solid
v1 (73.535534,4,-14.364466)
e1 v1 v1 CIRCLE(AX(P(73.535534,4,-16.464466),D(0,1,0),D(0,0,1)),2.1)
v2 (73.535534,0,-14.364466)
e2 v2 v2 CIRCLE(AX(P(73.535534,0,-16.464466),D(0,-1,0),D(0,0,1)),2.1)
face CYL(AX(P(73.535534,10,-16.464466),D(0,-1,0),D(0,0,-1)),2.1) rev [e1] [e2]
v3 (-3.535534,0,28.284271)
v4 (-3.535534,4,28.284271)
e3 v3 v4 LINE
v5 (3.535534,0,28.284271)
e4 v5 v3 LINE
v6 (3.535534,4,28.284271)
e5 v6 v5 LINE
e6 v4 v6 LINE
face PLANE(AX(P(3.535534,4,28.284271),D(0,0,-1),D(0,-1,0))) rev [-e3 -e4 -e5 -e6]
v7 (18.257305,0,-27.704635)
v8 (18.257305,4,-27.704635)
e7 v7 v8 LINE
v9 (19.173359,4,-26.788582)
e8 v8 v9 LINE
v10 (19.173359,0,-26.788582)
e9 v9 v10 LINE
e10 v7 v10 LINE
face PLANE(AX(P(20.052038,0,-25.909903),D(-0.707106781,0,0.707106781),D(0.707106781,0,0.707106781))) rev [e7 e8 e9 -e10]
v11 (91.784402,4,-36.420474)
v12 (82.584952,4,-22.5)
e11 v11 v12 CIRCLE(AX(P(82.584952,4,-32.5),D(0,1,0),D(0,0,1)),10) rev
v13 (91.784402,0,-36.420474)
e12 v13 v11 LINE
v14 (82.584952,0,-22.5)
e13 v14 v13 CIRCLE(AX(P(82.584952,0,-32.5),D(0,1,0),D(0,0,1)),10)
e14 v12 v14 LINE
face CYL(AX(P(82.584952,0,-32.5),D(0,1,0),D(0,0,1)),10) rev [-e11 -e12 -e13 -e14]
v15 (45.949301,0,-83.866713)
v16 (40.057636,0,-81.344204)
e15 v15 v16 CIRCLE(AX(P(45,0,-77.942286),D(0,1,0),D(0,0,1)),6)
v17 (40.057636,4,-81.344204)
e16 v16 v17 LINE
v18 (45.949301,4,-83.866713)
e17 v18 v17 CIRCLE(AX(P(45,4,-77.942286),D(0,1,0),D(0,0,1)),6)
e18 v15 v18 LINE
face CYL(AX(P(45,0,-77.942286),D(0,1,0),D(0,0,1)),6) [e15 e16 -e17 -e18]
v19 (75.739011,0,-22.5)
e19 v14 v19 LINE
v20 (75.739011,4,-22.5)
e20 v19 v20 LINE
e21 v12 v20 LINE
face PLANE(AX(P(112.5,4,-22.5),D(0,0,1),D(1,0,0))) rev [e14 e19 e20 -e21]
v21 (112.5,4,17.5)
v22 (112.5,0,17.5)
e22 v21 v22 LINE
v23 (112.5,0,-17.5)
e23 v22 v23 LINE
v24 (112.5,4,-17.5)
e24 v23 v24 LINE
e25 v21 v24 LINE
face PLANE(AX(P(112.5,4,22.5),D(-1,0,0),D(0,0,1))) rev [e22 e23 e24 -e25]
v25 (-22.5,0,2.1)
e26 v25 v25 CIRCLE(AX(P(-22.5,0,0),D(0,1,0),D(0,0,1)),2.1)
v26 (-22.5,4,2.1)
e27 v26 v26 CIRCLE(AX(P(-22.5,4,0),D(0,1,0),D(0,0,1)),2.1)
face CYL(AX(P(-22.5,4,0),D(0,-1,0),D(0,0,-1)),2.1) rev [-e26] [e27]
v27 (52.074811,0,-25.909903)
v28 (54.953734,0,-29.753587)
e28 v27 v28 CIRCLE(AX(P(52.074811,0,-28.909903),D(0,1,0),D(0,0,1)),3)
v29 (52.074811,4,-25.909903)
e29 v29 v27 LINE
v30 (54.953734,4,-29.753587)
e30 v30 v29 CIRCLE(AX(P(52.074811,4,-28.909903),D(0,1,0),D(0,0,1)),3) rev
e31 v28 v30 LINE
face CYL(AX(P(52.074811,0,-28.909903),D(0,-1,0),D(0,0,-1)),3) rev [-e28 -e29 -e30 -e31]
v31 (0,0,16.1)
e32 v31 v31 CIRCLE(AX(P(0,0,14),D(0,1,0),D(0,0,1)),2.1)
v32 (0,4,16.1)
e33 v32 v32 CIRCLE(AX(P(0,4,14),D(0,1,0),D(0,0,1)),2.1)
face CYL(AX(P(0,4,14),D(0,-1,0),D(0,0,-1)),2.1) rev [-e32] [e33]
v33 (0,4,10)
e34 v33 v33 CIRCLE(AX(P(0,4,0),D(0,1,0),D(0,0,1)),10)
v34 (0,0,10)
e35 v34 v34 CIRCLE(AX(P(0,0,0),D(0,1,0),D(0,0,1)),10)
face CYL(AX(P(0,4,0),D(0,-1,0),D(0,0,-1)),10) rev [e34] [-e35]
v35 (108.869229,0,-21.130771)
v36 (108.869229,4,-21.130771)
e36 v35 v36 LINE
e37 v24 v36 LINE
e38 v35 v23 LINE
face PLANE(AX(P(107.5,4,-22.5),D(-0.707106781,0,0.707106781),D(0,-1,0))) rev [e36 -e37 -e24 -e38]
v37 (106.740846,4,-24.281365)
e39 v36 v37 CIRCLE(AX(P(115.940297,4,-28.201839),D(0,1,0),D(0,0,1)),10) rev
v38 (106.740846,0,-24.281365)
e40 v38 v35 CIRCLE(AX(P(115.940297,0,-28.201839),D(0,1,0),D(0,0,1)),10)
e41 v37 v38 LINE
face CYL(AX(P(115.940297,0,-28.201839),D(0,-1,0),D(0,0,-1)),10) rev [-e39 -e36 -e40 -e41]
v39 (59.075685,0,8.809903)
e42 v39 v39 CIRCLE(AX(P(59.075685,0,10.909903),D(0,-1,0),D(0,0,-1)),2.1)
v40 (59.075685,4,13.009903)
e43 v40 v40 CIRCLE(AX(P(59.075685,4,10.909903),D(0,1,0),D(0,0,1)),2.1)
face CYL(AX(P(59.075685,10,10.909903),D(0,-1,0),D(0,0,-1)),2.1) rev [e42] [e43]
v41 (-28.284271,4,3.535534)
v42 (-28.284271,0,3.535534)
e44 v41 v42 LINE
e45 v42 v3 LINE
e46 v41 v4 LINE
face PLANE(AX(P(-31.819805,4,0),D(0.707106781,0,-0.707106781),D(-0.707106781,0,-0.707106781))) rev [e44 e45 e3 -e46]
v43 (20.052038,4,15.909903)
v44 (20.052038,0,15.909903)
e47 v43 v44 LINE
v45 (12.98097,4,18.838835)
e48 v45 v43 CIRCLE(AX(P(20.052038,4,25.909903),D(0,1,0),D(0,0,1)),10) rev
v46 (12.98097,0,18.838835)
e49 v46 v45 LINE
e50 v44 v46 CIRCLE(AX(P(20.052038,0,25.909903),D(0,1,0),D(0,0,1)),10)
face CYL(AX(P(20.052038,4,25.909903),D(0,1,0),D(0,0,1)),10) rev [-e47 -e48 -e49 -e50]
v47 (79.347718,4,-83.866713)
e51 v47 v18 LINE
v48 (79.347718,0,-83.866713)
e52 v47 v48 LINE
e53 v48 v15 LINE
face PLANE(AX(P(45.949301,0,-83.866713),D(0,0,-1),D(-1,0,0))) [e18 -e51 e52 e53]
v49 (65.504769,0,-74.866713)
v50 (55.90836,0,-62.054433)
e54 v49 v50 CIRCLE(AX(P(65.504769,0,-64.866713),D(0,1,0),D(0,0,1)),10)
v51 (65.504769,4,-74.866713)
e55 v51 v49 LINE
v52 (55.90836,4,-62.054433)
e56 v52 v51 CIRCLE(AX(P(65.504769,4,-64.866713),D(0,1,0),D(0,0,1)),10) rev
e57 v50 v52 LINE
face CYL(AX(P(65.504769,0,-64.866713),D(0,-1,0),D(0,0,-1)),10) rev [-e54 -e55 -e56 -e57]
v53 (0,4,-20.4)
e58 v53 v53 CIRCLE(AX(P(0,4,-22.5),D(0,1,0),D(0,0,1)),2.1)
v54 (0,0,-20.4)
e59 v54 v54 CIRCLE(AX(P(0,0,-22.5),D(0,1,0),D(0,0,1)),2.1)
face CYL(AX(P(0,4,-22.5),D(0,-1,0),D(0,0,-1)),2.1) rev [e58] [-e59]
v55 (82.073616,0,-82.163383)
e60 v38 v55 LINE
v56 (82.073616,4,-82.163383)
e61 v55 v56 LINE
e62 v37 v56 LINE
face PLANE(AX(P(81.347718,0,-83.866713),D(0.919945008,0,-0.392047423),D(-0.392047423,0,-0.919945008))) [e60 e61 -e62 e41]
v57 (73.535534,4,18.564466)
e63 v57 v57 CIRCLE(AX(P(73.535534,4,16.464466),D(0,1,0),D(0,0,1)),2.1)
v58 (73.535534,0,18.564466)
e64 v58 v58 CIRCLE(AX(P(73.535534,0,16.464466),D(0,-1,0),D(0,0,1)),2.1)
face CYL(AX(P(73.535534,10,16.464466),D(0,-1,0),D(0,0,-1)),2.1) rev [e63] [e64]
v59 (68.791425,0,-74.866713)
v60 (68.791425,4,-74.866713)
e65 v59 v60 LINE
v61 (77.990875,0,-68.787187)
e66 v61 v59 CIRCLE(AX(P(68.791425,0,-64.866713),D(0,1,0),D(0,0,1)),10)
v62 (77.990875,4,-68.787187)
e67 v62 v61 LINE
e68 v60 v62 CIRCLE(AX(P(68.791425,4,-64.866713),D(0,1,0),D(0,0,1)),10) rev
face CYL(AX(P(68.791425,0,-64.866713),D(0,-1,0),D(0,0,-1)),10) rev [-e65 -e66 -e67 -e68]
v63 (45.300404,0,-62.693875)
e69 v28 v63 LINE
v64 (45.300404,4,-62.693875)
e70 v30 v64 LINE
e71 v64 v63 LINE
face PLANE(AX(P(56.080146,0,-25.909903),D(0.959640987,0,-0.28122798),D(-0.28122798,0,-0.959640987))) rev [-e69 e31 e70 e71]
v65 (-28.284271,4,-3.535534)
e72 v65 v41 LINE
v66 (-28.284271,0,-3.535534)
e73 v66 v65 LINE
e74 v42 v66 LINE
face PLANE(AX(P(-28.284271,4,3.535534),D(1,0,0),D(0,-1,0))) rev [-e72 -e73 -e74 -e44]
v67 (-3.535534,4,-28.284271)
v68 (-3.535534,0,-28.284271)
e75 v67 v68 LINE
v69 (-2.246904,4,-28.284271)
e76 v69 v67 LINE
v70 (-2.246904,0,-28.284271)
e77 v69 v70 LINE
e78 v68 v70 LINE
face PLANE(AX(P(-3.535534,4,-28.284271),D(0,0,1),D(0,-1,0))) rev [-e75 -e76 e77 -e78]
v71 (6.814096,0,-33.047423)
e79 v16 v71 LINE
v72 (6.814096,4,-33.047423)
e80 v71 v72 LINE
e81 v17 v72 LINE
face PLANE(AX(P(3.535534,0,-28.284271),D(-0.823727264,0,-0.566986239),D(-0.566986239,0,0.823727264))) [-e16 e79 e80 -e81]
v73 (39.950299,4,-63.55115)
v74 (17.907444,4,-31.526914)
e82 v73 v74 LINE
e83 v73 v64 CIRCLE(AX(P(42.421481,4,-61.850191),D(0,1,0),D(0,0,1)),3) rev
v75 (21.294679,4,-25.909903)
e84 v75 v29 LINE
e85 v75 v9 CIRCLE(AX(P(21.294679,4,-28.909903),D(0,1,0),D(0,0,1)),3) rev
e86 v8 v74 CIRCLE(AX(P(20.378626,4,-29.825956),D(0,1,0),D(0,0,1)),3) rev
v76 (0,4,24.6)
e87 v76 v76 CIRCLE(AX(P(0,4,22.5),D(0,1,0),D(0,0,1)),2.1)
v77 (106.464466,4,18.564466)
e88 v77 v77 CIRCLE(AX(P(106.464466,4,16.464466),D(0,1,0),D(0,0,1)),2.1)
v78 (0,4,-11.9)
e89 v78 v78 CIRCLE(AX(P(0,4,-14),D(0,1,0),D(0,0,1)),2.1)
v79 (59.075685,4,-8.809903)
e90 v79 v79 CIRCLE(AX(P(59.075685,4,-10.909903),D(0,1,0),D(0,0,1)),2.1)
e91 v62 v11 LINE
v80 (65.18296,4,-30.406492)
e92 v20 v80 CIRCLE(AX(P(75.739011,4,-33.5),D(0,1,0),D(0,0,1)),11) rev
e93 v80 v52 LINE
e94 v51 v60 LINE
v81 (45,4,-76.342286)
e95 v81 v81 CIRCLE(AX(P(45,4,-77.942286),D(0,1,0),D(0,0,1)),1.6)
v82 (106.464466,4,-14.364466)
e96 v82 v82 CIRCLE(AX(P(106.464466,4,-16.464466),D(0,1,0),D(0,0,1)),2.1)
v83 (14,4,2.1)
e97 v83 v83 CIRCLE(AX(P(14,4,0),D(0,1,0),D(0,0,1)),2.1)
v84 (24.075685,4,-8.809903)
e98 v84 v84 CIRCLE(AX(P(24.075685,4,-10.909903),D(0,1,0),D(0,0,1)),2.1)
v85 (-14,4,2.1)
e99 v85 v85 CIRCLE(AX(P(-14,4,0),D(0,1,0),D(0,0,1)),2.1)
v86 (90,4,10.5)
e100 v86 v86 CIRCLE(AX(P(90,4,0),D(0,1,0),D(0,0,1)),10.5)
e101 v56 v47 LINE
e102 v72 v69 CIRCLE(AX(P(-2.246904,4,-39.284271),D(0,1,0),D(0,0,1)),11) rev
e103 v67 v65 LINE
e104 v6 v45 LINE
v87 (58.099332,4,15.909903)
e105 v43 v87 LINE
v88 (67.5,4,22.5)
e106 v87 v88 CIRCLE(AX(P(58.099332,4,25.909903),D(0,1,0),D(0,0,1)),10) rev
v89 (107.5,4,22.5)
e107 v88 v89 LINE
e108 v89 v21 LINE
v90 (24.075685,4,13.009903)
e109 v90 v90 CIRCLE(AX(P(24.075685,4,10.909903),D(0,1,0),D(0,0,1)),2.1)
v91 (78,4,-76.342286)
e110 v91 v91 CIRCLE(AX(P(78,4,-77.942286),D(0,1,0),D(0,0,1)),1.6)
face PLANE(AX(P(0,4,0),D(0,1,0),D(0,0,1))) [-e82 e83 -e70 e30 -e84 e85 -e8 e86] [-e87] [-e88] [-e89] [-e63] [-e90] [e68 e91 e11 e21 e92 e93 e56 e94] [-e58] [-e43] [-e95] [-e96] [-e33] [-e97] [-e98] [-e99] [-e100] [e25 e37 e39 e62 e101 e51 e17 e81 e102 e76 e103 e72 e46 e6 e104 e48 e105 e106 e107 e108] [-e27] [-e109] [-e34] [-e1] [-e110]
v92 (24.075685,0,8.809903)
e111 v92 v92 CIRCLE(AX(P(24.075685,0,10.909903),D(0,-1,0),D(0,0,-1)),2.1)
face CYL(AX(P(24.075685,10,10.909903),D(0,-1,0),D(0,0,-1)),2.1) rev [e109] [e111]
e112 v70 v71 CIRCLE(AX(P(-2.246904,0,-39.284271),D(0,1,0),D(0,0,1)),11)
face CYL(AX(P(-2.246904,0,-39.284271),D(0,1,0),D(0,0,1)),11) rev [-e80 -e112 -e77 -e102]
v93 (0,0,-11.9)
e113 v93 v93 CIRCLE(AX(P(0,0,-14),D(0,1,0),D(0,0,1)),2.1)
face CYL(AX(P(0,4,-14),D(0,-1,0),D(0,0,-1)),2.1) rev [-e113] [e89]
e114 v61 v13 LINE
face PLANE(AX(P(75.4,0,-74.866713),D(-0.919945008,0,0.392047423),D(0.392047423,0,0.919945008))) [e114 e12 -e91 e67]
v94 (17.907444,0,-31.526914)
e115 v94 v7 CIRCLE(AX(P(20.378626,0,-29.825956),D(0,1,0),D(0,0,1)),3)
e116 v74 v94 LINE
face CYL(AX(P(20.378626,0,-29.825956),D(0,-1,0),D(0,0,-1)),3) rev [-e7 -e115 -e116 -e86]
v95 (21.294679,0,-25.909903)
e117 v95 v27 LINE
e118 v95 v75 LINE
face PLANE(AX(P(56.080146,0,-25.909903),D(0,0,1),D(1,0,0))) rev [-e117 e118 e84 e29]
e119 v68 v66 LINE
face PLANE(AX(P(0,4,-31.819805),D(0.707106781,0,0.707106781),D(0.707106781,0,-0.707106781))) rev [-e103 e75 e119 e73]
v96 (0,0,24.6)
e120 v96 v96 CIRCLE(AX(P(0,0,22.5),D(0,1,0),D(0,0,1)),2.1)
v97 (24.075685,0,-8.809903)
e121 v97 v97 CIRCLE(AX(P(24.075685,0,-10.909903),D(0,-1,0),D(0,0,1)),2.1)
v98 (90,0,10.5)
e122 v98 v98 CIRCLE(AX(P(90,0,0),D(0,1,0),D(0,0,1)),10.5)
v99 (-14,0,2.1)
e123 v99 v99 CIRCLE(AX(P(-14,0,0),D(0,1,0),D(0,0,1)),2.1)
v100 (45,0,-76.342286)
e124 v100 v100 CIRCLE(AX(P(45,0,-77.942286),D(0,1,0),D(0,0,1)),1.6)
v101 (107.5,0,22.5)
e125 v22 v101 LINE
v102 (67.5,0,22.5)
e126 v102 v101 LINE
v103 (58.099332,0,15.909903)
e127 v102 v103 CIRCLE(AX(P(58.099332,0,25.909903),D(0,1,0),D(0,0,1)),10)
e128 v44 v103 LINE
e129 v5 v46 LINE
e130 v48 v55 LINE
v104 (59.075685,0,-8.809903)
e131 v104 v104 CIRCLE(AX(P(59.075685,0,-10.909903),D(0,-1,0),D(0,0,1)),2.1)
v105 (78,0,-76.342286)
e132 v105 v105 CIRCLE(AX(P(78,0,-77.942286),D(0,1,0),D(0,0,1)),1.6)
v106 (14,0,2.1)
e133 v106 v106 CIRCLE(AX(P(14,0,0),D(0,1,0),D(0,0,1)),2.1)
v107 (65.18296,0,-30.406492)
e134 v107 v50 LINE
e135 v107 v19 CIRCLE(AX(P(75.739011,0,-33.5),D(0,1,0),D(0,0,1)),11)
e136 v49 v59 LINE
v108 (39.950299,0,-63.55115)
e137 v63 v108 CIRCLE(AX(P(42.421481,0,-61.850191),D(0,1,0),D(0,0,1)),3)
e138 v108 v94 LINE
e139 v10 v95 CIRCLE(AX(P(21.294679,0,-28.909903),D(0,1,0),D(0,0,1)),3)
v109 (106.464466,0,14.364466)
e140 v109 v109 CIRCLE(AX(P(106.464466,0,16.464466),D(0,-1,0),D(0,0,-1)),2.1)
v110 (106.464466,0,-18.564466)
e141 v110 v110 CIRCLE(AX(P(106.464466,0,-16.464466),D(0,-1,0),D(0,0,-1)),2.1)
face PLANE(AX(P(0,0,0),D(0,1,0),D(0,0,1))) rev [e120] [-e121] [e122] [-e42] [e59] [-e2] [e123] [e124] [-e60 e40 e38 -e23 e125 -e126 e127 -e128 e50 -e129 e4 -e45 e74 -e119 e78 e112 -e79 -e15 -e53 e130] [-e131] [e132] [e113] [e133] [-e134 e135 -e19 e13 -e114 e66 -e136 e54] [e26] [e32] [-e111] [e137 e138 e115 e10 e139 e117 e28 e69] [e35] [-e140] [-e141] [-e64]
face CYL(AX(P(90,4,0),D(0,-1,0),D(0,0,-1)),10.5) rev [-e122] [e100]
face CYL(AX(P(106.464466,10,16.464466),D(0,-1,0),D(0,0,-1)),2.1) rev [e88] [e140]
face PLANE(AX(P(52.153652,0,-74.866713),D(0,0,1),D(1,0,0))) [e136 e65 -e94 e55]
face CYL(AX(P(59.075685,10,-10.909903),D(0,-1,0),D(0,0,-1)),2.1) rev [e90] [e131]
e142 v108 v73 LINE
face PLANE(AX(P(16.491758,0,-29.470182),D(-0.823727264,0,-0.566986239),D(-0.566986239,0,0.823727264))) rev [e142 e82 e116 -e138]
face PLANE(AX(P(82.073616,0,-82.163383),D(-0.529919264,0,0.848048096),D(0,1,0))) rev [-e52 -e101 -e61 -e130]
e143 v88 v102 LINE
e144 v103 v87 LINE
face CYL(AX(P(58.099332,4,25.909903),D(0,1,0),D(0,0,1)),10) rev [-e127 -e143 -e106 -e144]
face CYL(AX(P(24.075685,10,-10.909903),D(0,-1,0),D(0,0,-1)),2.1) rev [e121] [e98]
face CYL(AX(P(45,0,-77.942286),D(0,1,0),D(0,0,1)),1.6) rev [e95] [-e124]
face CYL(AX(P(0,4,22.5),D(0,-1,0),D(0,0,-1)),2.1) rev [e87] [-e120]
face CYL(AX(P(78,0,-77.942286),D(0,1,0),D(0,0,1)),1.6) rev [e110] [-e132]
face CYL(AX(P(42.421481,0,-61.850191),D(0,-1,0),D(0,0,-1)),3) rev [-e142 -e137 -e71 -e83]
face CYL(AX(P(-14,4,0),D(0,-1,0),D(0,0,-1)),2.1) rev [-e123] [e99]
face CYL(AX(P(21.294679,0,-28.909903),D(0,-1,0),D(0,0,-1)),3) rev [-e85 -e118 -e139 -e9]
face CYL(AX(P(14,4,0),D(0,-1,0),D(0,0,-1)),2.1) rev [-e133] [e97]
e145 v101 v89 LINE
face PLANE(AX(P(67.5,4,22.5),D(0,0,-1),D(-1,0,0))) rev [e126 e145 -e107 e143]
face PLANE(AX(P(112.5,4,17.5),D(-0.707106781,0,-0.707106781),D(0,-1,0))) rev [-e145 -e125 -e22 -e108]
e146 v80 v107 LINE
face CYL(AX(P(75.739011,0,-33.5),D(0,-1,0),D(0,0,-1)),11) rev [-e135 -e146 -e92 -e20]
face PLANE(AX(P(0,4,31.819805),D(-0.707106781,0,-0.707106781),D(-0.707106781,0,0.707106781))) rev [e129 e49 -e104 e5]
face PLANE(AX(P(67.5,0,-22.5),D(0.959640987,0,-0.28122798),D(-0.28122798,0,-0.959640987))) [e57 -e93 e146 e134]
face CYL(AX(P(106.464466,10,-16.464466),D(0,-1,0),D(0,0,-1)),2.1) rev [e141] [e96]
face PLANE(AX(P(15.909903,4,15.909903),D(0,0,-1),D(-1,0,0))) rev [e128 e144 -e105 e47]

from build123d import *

# Parameters (mm, degrees)
SKETCH_1_R          = 2.1
SKETCH_1_R_2        = 10.5
SKETCH_1_R_3        = 10
EXTRUDE_1_DEPTH     = 4
CHAMFER_1_SIZE      = 5
FILLET_1_R          = 10
SKETCH_2_R          = 2.1
CUT_EXTRUDE_1_DEPTH = 10
EXTRUDE_START       = -4
SKETCH_3_R          = 1.6
EXTRUDE_2_DEPTH     = 4
FILLET_2_R          = 3
FILLET_3_R          = 11
SKETCH_4_R          = 1.6
EXTRUDE_3_DEPTH     = 4
FILLET_4_R          = 10
CHAMFER_2_SIZE      = 2
CHAMFER_2_SIZE2     = 1.851556395
FILLET_5_R          = 10


with BuildPart() as part:
    # 草图1 → 凸台-拉伸1 (new body)
    with BuildSketch(Plane(origin=(0, 0, 0), x_dir=(1, 0, 0), z_dir=(0, 1, 0))):
        Polygon((0, 31.819805153), (-31.819805153, 0), (0, -31.819805153), (15.909902577, -15.909902577), (67.5, -15.909902577), (67.5, -22.5), (112.5, -22.5), (112.5, 22.5), (67.5, 22.5), (67.5, 15.909902577), (15.909902577, 15.909902577), align=None)
        with Locations(Location((0, 14, 0), (0, 0, 270))):
            Circle(SKETCH_1_R, mode=Mode.SUBTRACT)
        with Locations(Location((14, 0, 0), (0, 0, 270))):
            Circle(SKETCH_1_R, mode=Mode.SUBTRACT)
        with Locations(Location((0, -14, 0), (0, 0, 270))):
            Circle(SKETCH_1_R, mode=Mode.SUBTRACT)
        with Locations(Location((-14, 0, 0), (0, 0, 270))):
            Circle(SKETCH_1_R, mode=Mode.SUBTRACT)
        with Locations(Location((90, 0, 0), (0, 0, 270))):
            Circle(SKETCH_1_R_2, mode=Mode.SUBTRACT)
        with Locations(Location((0, 22.5, 0), (0, 0, 270))):
            Circle(SKETCH_1_R, mode=Mode.SUBTRACT)
        with Locations(Location((0, -22.5, 0), (0, 0, 270))):
            Circle(SKETCH_1_R, mode=Mode.SUBTRACT)
        with Locations(Location((0, 0, 0), (0, 0, 270))):
            Circle(SKETCH_1_R_3, mode=Mode.SUBTRACT)
        with Locations(Location((-22.5, 0, 0), (0, 0, 270))):
            Circle(SKETCH_1_R, mode=Mode.SUBTRACT)
    extrude(amount=EXTRUDE_1_DEPTH)

    # 倒角1
    chamfer_1_edges = [part.edges().sort_by_distance(p)[0] for p in [
        (112.5, 2, -22.5),
        (112.5, 2, 22.5),
        (0, 2, 31.819805153),
        (-31.819805153, 2, 0),
        (0, 2, -31.819805153),
    ]]
    chamfer(chamfer_1_edges, length=CHAMFER_1_SIZE)

    # 圆角1
    # the kernel refuses this fillet: 10 mm, written as the material it adds along each edge
    with BuildSketch(Plane(origin=(15.909902577, 0, -15.909902577), x_dir=(-0.707106781186552, 0, -0.707106781186543), z_dir=(0, 1, 0))) as fillet_1_piece_1:
        with BuildLine():
            CenterArc((FILLET_1_R * 0.414213562373, -FILLET_1_R), FILLET_1_R, 90, 45)
            Line((-FILLET_1_R * 0.292893218813, -FILLET_1_R * 0.292893218813), (-FILLET_1_R * 0.307035354437, -FILLET_1_R * 0.27875108319))
            Line((-FILLET_1_R * 0.307035354437, -FILLET_1_R * 0.27875108319), (-FILLET_1_R * 0.00828427124746, FILLET_1_R * 0.02))
            Line((-FILLET_1_R * 0.00828427124746, FILLET_1_R * 0.02), (FILLET_1_R * 0.414213562373, FILLET_1_R * 0.02))
            Line((FILLET_1_R * 0.414213562373, FILLET_1_R * 0.02), (FILLET_1_R * 0.414213562373, 0))
        make_face()
    extrude(amount=4)
    with BuildSketch(Plane(origin=(15.909902577, 0, 15.909902577), x_dir=(-0.7071067811865422, 0, 0.707106781186553), z_dir=(0, 1, 0))) as fillet_1_piece_2:
        with BuildLine():
            CenterArc((FILLET_1_R * 0.414213562373, FILLET_1_R), FILLET_1_R, 225, 45)
            Line((-FILLET_1_R * 0.292893218813, FILLET_1_R * 0.292893218813), (-FILLET_1_R * 0.307035354437, FILLET_1_R * 0.27875108319))
            Line((-FILLET_1_R * 0.307035354437, FILLET_1_R * 0.27875108319), (-FILLET_1_R * 0.00828427124746, -FILLET_1_R * 0.02))
            Line((-FILLET_1_R * 0.00828427124746, -FILLET_1_R * 0.02), (FILLET_1_R * 0.414213562373, -FILLET_1_R * 0.02))
            Line((FILLET_1_R * 0.414213562373, -FILLET_1_R * 0.02), (FILLET_1_R * 0.414213562373, 0))
        make_face()
    extrude(amount=4)
    with BuildSketch(Plane(origin=(67.5, 0, 15.909902577), x_dir=(-1, 0, 0), z_dir=(0, 1, 0))) as fillet_1_piece_3:
        with BuildLine():
            CenterArc((9.400668296, 10), FILLET_1_R, 199.937217397, 70.062782603)
            Line((0, 6.590097423), (-0.188013366, 6.521899372))
            ThreePointArc((-0.188013366, 6.521899372), (-0.2, 3.295048712), (-0.2, 0))
            Line((-0.2, 0), (0, -0.2))
            Line((0, -0.2), (9.400668296, -0.2))
            Line((9.400668296, -0.2), (9.400668296, 0))
        make_face()
    extrude(amount=4)
    with BuildSketch(Plane(origin=(67.5, 0, -15.909902577), x_dir=(-1, 0, 0), z_dir=(0, 1, 0))) as fillet_1_piece_4:
        with BuildLine():
            CenterArc((9.400668296, -10), FILLET_1_R, 90, 70.062782603)
            Line((0, -6.590097423), (-0.188013366, -6.521899372))
            ThreePointArc((-0.188013366, -6.521899372), (-0.2, -3.295048712), (-0.2, 0))
            Line((-0.2, 0), (0, 0.2))
            Line((0, 0.2), (9.400668296, 0.2))
            Line((9.400668296, 0.2), (9.400668296, 0))
        make_face()
    extrude(amount=4)

    # 草图2 → 切除-拉伸1 (cut)
    with BuildSketch(Plane.XZ):
        with Locations(Location((106.464466094, 16.464466094, 0), (0, 0, 270))):
            Circle(SKETCH_2_R)
        with Locations(Location((106.464466094, -16.464466094, 0), (0, 0, 270))):
            Circle(SKETCH_2_R)
        with Locations(Location((73.535533906, -16.464466094, 0), (0, 0, 90))):
            Circle(SKETCH_2_R)
        with Locations(Location((73.535533906, 16.464466094, 0), (0, 0, 90))):
            Circle(SKETCH_2_R)
        with Locations(Location((24.075684952, 10.909902577, 0), (0, 0, 270))):
            Circle(SKETCH_2_R)
        with Locations(Location((59.075684952, 10.909902577, 0), (0, 0, 270))):
            Circle(SKETCH_2_R)
        with Locations(Location((59.075684952, -10.909902577, 0), (0, 0, 90))):
            Circle(SKETCH_2_R)
        with Locations(Location((24.075684952, -10.909902577, 0), (0, 0, 90))):
            Circle(SKETCH_2_R)
    extrude(amount=-CUT_EXTRUDE_1_DEPTH, mode=Mode.SUBTRACT)

    # 草图3 → 凸台-拉伸2 (add)
    with BuildSketch(Plane(origin=(0, 4, 0), x_dir=(1, 0, 0), z_dir=(0, 1, 0)).offset(EXTRUDE_START)):
        with BuildLine():
            Line((3.535533906, 28.284271247), (40.057636417, 81.344203773))
            ThreePointArc((40.057636417, 81.344203773), (45.94930127, 83.86671265), (50.75784592, 79.629654221))
            Line((50.75784592, 79.629654221), (67.5, 22.5))
            ThreePointArc((67.5, 22.5), (63.839583189, 17.721525883), (58.099331704, 15.909902577))
            Line((58.099331704, 15.909902577), (20.0520382, 15.909902577))
            ThreePointArc((20.0520382, 15.909902577), (16.225203877, 16.671107252), (12.980970389, 18.838834765))
            Line((12.980970389, 18.838834765), (3.535533906, 28.284271247))
        make_face()
        with Locations(Location((45, 77.942286341, 0), (0, 0, 270))):
            Circle(SKETCH_3_R, mode=Mode.SUBTRACT)
        Polygon((16.491758356, 29.470182421), (43.526560522, 68.746803428), (56.080145943, 25.909902577), (20.0520382, 25.909902577), align=None, mode=Mode.SUBTRACT)
    extrude(amount=EXTRUDE_2_DEPTH)

    # 圆角2
    fillet_2_edges = [part.edges().sort_by_distance(p)[0] for p in [
        (16.491758356, 2, -29.470182421),
        (43.526560522, 2, -68.746803428),
        (56.080145943, 2, -25.909902577),
        (20.0520382, 2, -25.909902577),
    ]]
    fillet(fillet_2_edges, radius=FILLET_2_R)

    # 圆角3
    fillet_3_edges = [part.edges().sort_by_distance(p)[0] for p in [
        (67.5, 2, -22.5),
        (3.535533906, 2, -28.284271247),
    ]]
    fillet(fillet_3_edges, radius=FILLET_3_R)

    # 草图4 → 凸台-拉伸3 (add)
    with BuildSketch(Plane(origin=(0, 4, 0), x_dir=(1, 0, 0), z_dir=(0, 1, 0)).offset(EXTRUDE_START)):
        with BuildLine():
            Line((45.94930127, 83.86671265), (81.347717681, 83.86671265))
            Line((81.347717681, 83.86671265), (107.5, 22.5))
            Line((107.5, 22.5), (97.716806526, 22.5))
            Line((97.716806526, 22.5), (75.4, 74.86671265))
            Line((75.4, 74.86671265), (52.153651701, 74.86671265))
            Line((52.153651701, 74.86671265), (50.75784592, 79.629654221))
            ThreePointArc((50.75784592, 79.629654221), (48.966689034, 82.443994695), (45.94930127, 83.86671265))
        make_face()
        with Locations(Location((78, 77.942286341, 0), (0, 0, 270))):
            Circle(SKETCH_4_R, mode=Mode.SUBTRACT)
    extrude(amount=EXTRUDE_3_DEPTH)

    # 圆角4
    fillet_4_edges = [part.edges().sort_by_distance(p)[0] for p in [
        (97.716806526, 2, -22.5),
        (75.4, 2, -74.86671265),
        (52.153651701, 2, -74.86671265),
    ]]
    fillet(fillet_4_edges, radius=FILLET_4_R)

    # 倒角2
    chamfer_2_edges = [part.edges().sort_by_distance(p)[0] for p in [
        (81.347717681, 2, -83.86671265),
    ]]
    chamfer_2_side = [part.faces().sort_by_distance(p)[0] for p in [
        (63.648509476, 2, -83.86671265),
    ]]
    chamfer(chamfer_2_edges, length=CHAMFER_2_SIZE, length2=CHAMFER_2_SIZE2, reference=chamfer_2_side[0])

    # 圆角5
    fillet_5_edges = [part.edges().sort_by_distance(p)[0] for p in [
        (107.5, 2, -22.5),
    ]]
    fillet(fillet_5_edges, radius=FILLET_5_R)


solid = part.part
